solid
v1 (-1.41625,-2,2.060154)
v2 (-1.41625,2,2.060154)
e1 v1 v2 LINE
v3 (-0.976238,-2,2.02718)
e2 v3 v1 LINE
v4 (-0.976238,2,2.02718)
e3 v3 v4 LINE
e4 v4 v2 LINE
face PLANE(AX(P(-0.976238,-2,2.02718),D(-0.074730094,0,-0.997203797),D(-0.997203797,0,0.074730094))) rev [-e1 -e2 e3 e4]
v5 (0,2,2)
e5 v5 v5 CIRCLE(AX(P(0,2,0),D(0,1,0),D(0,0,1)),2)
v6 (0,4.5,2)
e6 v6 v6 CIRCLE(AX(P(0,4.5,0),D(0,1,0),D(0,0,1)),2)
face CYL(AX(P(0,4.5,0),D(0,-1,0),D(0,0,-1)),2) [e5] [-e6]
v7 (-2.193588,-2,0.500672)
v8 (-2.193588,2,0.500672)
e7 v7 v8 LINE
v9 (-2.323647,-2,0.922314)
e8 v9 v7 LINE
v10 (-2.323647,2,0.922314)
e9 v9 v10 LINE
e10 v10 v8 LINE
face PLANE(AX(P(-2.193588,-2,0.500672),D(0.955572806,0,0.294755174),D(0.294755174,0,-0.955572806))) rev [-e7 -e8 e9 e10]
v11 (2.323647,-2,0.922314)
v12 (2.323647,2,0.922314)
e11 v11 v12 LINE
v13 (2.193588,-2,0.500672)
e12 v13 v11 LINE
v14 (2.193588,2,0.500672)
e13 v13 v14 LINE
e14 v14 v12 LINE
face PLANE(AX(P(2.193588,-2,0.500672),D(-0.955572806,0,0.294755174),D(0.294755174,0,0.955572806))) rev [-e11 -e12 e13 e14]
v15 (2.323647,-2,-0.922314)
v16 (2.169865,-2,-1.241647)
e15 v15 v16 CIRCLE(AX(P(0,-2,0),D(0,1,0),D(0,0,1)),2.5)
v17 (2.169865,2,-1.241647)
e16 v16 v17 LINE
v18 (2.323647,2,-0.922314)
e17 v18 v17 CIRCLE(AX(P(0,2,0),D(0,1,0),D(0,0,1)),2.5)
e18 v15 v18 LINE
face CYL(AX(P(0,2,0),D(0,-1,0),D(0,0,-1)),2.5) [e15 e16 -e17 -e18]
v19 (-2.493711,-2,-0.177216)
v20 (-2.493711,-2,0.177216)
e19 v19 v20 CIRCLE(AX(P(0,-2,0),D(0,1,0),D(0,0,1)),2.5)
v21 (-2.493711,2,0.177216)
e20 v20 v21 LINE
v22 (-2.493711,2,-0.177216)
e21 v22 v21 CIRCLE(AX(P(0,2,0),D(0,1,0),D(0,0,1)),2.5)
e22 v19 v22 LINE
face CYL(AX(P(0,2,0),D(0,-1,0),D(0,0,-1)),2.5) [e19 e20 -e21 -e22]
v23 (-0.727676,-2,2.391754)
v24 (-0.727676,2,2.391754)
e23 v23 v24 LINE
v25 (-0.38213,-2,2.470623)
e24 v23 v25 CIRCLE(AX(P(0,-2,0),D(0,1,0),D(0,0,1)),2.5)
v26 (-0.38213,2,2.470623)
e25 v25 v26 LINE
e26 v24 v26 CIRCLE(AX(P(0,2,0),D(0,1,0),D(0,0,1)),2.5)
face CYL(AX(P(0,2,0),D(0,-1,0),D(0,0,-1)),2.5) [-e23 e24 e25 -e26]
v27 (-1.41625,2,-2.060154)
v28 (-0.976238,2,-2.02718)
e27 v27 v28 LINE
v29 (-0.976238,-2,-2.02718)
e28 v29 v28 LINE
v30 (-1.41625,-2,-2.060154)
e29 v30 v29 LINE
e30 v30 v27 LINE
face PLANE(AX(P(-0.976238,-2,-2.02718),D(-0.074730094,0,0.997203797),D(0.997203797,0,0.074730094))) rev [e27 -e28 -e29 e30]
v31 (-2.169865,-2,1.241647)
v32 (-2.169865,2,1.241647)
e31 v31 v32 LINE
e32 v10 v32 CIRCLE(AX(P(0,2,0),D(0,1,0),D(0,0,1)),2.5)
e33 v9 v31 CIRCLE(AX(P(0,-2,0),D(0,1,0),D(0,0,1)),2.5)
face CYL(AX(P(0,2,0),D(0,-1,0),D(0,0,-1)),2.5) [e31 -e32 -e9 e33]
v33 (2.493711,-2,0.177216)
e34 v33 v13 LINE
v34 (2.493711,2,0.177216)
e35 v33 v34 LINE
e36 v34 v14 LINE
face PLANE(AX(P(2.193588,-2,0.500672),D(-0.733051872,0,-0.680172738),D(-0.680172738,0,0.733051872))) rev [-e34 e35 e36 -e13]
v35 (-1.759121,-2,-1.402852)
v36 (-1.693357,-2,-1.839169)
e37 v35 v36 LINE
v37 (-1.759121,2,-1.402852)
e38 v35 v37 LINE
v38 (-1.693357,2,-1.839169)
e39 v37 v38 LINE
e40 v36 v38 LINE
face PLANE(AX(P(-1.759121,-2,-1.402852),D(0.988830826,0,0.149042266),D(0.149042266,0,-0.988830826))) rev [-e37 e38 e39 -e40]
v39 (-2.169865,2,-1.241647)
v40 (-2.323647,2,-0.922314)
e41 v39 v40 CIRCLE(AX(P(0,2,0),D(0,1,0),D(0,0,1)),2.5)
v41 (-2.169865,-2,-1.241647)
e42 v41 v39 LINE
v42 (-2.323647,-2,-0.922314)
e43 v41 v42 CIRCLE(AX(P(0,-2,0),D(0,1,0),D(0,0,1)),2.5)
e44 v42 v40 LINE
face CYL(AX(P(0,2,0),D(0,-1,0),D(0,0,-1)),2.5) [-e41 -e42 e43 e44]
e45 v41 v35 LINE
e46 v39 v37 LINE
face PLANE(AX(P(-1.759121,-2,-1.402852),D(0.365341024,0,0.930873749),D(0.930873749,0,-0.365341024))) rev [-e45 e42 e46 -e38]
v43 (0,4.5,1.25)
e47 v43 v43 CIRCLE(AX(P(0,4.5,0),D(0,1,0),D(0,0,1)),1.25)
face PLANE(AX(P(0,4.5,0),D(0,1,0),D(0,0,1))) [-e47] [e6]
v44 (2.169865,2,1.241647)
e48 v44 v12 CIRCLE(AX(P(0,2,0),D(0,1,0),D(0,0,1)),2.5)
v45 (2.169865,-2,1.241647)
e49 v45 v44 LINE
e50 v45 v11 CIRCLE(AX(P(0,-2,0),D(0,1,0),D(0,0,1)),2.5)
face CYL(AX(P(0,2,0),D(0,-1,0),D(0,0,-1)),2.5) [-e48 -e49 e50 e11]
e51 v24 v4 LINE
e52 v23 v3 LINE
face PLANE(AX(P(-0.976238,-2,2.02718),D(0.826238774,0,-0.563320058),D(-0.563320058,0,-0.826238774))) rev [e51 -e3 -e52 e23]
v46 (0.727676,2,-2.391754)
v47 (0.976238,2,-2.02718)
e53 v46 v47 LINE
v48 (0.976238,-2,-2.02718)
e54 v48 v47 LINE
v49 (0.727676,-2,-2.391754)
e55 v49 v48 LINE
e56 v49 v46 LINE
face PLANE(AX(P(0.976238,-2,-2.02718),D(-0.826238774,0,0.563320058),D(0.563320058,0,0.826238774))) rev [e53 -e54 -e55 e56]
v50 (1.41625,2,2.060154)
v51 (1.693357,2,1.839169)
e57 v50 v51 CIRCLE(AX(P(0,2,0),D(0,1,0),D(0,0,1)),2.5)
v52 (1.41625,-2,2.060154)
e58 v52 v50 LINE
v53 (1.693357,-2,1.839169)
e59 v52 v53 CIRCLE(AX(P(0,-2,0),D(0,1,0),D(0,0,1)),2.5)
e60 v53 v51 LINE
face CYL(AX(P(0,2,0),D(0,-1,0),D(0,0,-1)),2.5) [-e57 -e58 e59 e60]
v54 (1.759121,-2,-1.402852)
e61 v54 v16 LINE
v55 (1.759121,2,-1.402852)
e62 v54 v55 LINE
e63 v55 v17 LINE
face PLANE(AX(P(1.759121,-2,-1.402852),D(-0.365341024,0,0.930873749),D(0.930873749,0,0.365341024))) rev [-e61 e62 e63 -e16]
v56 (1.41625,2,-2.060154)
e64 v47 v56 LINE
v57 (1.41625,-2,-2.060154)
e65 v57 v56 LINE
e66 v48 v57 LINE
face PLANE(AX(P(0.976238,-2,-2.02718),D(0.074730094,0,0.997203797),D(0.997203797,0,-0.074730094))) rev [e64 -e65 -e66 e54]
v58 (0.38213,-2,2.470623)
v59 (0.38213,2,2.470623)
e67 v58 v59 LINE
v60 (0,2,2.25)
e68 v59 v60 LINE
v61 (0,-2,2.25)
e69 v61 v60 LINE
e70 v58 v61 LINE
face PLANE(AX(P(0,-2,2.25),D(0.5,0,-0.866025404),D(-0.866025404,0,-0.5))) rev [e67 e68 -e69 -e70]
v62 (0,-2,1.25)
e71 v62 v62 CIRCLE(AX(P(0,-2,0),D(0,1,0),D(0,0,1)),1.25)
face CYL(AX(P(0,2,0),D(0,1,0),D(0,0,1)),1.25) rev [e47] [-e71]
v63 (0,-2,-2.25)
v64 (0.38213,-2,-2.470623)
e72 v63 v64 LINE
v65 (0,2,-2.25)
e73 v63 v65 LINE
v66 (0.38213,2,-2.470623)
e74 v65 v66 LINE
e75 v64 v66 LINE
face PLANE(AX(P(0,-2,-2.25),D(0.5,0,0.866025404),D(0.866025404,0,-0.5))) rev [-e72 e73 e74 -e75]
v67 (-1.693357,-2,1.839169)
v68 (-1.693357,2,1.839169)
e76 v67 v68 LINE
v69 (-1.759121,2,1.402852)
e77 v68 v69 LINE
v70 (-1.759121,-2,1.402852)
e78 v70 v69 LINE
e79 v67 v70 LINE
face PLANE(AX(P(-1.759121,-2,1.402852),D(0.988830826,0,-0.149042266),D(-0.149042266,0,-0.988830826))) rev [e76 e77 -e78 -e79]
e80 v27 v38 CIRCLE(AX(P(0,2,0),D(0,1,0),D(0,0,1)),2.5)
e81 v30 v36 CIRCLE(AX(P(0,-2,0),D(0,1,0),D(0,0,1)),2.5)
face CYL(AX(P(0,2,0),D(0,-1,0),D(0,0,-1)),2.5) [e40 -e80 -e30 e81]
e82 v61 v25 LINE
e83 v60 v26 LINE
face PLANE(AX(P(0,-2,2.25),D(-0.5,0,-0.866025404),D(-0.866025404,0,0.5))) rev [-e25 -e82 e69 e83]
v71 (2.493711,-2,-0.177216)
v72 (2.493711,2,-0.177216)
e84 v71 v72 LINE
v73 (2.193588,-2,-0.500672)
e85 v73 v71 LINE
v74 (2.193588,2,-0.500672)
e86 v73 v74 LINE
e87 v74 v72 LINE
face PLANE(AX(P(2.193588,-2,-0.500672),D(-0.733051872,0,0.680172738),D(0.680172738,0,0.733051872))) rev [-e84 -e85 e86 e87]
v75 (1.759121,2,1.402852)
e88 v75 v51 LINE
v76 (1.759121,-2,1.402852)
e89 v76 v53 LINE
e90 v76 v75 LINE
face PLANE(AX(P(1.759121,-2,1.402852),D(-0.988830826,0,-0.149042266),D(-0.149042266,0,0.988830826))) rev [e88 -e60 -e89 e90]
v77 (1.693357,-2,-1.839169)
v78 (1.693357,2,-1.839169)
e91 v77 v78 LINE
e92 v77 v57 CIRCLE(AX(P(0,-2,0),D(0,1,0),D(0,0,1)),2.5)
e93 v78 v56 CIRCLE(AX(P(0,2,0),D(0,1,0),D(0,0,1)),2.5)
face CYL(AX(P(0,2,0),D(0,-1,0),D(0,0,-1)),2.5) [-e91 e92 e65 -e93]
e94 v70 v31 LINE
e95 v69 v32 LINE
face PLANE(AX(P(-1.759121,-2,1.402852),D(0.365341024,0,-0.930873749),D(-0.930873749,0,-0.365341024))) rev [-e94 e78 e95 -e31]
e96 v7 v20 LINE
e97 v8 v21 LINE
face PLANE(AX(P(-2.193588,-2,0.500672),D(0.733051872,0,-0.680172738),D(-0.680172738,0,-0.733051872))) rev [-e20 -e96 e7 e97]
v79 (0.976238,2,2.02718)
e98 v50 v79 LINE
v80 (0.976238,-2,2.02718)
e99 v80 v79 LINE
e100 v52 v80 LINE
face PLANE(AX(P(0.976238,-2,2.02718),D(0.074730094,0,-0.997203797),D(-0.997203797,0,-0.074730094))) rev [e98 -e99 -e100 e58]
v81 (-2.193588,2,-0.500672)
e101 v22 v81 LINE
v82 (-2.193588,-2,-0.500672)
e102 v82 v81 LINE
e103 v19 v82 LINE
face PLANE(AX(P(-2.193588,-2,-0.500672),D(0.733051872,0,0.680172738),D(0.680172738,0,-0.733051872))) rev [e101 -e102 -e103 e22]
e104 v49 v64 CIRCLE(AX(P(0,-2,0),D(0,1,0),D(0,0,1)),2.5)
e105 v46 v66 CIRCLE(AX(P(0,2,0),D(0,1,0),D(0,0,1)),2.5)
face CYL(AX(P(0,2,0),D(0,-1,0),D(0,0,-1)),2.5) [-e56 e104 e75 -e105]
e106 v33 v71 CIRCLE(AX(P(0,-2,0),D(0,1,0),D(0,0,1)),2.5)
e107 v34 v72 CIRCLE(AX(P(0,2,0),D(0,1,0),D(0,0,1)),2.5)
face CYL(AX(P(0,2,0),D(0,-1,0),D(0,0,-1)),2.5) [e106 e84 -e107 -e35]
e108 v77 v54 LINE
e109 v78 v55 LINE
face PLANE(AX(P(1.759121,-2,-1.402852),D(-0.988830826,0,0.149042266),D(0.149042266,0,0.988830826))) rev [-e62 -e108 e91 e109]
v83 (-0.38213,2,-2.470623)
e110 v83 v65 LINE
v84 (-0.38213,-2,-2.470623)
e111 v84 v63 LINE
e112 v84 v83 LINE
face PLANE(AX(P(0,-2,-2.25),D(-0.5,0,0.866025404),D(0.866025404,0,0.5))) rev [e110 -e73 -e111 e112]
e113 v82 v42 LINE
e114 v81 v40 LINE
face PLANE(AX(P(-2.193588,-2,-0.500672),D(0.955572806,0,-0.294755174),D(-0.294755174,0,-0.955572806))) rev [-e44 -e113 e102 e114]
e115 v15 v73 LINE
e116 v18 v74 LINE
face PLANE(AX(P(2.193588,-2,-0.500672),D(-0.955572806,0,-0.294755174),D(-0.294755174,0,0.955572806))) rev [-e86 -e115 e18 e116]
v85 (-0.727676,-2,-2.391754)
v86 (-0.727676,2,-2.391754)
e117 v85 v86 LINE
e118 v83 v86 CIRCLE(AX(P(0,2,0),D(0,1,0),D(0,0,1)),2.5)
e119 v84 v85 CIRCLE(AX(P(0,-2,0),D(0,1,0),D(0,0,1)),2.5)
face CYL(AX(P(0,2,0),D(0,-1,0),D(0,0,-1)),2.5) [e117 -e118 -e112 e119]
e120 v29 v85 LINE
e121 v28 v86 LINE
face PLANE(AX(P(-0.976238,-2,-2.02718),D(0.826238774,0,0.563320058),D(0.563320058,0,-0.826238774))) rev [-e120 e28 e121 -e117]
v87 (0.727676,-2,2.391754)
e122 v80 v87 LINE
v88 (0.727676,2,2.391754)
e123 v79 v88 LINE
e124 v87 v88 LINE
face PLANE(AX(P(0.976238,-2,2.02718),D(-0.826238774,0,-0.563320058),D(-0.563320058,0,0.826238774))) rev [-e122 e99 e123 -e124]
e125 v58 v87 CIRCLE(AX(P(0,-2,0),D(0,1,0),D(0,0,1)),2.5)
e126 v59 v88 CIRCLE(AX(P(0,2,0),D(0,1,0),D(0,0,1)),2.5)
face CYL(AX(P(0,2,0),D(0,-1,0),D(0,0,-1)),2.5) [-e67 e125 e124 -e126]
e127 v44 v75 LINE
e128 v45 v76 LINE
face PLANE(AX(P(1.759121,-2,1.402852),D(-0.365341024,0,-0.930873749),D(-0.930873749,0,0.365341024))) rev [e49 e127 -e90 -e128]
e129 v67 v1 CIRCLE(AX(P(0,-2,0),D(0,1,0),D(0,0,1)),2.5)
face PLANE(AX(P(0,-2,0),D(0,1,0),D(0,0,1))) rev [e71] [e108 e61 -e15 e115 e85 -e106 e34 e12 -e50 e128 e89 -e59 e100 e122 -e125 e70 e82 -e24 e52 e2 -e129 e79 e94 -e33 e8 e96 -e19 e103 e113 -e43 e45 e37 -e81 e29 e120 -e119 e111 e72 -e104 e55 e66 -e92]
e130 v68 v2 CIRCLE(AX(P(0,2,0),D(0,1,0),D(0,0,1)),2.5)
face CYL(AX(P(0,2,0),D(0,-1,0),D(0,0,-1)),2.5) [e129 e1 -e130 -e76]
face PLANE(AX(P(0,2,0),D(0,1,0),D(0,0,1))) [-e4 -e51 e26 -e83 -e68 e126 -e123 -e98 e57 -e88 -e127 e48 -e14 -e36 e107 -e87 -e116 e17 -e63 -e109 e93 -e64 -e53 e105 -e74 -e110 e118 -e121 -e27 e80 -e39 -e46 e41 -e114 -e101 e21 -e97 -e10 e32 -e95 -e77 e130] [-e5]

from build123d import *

# Parameters (mm, degrees)
MAINBODYS_R           = 2.5
MAIN_BODY_DEPTH       = 2
M3X0_5_TAPPED_HOLE1_D = 2.5
GROOVED_CUT_DEPTH     = 6.338539126
GC_START              = -2
GC_CP_DEPTH           = 4
PRESSFITBODYS_R       = 2
PRESSFITBODYS_R_2     = 1.25
PRESS_FIT_BODY_DEPTH  = 2.5


# Read off the part's stored shape, not the designer's step: GC CP
with BuildPart() as part:
    # MainBodyS → MAIN BODY (new, symmetric)
    with BuildSketch(Plane(origin=(0, 0, 0), x_dir=(1, 0, 0), z_dir=(0, 1, 0))):
        with Locations(Location((0, 0, 0), (0, 0, 270))):
            Circle(MAINBODYS_R)
    extrude(amount=MAIN_BODY_DEPTH, both=True)

    # M3x0.5 Tapped Hole1 (through all)
    with Locations(Plane(origin=(0, 2, 0), x_dir=(1, 0, 0), z_dir=(0, 1, 0))):
        with Locations((0, 0)):
            Hole(M3X0_5_TAPPED_HOLE1_D / 2)

    # GroovedCutS → GROOVED CUT (cut, through all)
    with BuildSketch(Plane(origin=(0, 2, 0), x_dir=(1, 0, 0), z_dir=(0, 1, 0))):
        with BuildLine():
            Line((0, 2.25), (0.382129822, 2.470622755))
            ThreePointArc((0.382129822, 2.470622755), (0, 2.5), (-0.382129822, 2.470622755))
            Line((-0.382129822, 2.470622755), (0, 2.25))
        make_face()
    extrude(amount=-GROOVED_CUT_DEPTH, mode=Mode.SUBTRACT)

    # GC CP outline → GC CP (cut)
    with BuildSketch(Plane(origin=(0, 0, 0), x_dir=(1, 0, 0), z_dir=(0, 1, 0)).offset(GC_START)):
        with BuildLine():
            ThreePointArc((-0.727675966, 2.391754103), (-1.084709348, 2.25242217), (-1.416250112, 2.060154271))
            Line((-1.416250112, 2.060154271), (-0.976238413, 2.027179953))
            Line((-0.976238413, 2.027179953), (-0.727675966, 2.391754103))
        make_face()
        with BuildLine():
            Line((0.976238413, 2.027179953), (1.416250112, 2.060154271))
            ThreePointArc((1.416250112, 2.060154271), (1.084709348, 2.25242217), (0.727675966, 2.391754103))
            Line((0.727675966, 2.391754103), (0.976238413, 2.027179953))
        make_face()
        with BuildLine():
            Line((1.759120836, 1.402852054), (2.169864698, 1.241646967))
            ThreePointArc((2.169864698, 1.241646967), (1.954578706, 1.558724504), (1.693356605, 1.839169217))
            Line((1.693356605, 1.839169217), (1.759120836, 1.402852054))
        make_face()
        with BuildLine():
            Line((2.193587802, 0.500672101), (2.493710969, 0.177216254))
            ThreePointArc((2.493710969, 0.177216254), (2.43731978, 0.556302335), (2.3236472, 0.922314312))
            Line((2.3236472, 0.922314312), (2.193587802, 0.500672101))
        make_face()
        with BuildLine():
            Line((2.193587802, -0.500672101), (2.3236472, -0.922314312))
            ThreePointArc((2.3236472, -0.922314312), (2.43731978, -0.556302335), (2.493710969, -0.177216254))
            Line((2.493710969, -0.177216254), (2.193587802, -0.500672101))
        make_face()
        with BuildLine():
            Line((1.759120836, -1.402852054), (1.693356605, -1.839169217))
            ThreePointArc((1.693356605, -1.839169217), (1.954578706, -1.558724504), (2.169864698, -1.241646967))
            Line((2.169864698, -1.241646967), (1.759120836, -1.402852054))
        make_face()
        with BuildLine():
            Line((0.976238413, -2.027179953), (0.727675966, -2.391754103))
            ThreePointArc((0.727675966, -2.391754103), (1.084709348, -2.25242217), (1.416250112, -2.060154271))
            Line((1.416250112, -2.060154271), (0.976238413, -2.027179953))
        make_face()
        with BuildLine():
            Line((0, -2.25), (-0.382129822, -2.470622755))
            ThreePointArc((-0.382129822, -2.470622755), (0, -2.5), (0.382129822, -2.470622755))
            Line((0.382129822, -2.470622755), (0, -2.25))
        make_face()
        with BuildLine():
            Line((-0.976238413, -2.027179953), (-1.416250112, -2.060154271))
            ThreePointArc((-1.416250112, -2.060154271), (-1.084709348, -2.25242217), (-0.727675966, -2.391754103))
            Line((-0.727675966, -2.391754103), (-0.976238413, -2.027179953))
        make_face()
        with BuildLine():
            Line((-1.759120836, -1.402852054), (-2.169864698, -1.241646967))
            ThreePointArc((-2.169864698, -1.241646967), (-1.954578706, -1.558724504), (-1.693356605, -1.839169217))
            Line((-1.693356605, -1.839169217), (-1.759120836, -1.402852054))
        make_face()
        with BuildLine():
            Line((-2.193587802, -0.500672101), (-2.493710969, -0.177216254))
            ThreePointArc((-2.493710969, -0.177216254), (-2.43731978, -0.556302335), (-2.3236472, -0.922314312))
            Line((-2.3236472, -0.922314312), (-2.193587802, -0.500672101))
        make_face()
        with BuildLine():
            Line((-2.193587802, 0.500672101), (-2.3236472, 0.922314312))
            ThreePointArc((-2.3236472, 0.922314312), (-2.43731978, 0.556302335), (-2.493710969, 0.177216254))
            Line((-2.493710969, 0.177216254), (-2.193587802, 0.500672101))
        make_face()
        with BuildLine():
            Line((-1.759120836, 1.402852054), (-1.693356605, 1.839169217))
            ThreePointArc((-1.693356605, 1.839169217), (-1.954578706, 1.558724504), (-2.169864698, 1.241646967))
            Line((-2.169864698, 1.241646967), (-1.759120836, 1.402852054))
        make_face()
    extrude(amount=GC_CP_DEPTH, mode=Mode.SUBTRACT)

    # PressFitBodyS → PRESS FIT BODY (add)
    with BuildSketch(Plane(origin=(0, 2, 0), x_dir=(1, 0, 0), z_dir=(0, 1, 0))):
        with Locations(Location((0, 0, 0), (0, 0, 270))):
            Circle(PRESSFITBODYS_R)
        with Locations(Location((0, 0, 0), (0, 0, 270))):
            Circle(PRESSFITBODYS_R_2, mode=Mode.SUBTRACT)
    extrude(amount=PRESS_FIT_BODY_DEPTH)


solid = part.part
